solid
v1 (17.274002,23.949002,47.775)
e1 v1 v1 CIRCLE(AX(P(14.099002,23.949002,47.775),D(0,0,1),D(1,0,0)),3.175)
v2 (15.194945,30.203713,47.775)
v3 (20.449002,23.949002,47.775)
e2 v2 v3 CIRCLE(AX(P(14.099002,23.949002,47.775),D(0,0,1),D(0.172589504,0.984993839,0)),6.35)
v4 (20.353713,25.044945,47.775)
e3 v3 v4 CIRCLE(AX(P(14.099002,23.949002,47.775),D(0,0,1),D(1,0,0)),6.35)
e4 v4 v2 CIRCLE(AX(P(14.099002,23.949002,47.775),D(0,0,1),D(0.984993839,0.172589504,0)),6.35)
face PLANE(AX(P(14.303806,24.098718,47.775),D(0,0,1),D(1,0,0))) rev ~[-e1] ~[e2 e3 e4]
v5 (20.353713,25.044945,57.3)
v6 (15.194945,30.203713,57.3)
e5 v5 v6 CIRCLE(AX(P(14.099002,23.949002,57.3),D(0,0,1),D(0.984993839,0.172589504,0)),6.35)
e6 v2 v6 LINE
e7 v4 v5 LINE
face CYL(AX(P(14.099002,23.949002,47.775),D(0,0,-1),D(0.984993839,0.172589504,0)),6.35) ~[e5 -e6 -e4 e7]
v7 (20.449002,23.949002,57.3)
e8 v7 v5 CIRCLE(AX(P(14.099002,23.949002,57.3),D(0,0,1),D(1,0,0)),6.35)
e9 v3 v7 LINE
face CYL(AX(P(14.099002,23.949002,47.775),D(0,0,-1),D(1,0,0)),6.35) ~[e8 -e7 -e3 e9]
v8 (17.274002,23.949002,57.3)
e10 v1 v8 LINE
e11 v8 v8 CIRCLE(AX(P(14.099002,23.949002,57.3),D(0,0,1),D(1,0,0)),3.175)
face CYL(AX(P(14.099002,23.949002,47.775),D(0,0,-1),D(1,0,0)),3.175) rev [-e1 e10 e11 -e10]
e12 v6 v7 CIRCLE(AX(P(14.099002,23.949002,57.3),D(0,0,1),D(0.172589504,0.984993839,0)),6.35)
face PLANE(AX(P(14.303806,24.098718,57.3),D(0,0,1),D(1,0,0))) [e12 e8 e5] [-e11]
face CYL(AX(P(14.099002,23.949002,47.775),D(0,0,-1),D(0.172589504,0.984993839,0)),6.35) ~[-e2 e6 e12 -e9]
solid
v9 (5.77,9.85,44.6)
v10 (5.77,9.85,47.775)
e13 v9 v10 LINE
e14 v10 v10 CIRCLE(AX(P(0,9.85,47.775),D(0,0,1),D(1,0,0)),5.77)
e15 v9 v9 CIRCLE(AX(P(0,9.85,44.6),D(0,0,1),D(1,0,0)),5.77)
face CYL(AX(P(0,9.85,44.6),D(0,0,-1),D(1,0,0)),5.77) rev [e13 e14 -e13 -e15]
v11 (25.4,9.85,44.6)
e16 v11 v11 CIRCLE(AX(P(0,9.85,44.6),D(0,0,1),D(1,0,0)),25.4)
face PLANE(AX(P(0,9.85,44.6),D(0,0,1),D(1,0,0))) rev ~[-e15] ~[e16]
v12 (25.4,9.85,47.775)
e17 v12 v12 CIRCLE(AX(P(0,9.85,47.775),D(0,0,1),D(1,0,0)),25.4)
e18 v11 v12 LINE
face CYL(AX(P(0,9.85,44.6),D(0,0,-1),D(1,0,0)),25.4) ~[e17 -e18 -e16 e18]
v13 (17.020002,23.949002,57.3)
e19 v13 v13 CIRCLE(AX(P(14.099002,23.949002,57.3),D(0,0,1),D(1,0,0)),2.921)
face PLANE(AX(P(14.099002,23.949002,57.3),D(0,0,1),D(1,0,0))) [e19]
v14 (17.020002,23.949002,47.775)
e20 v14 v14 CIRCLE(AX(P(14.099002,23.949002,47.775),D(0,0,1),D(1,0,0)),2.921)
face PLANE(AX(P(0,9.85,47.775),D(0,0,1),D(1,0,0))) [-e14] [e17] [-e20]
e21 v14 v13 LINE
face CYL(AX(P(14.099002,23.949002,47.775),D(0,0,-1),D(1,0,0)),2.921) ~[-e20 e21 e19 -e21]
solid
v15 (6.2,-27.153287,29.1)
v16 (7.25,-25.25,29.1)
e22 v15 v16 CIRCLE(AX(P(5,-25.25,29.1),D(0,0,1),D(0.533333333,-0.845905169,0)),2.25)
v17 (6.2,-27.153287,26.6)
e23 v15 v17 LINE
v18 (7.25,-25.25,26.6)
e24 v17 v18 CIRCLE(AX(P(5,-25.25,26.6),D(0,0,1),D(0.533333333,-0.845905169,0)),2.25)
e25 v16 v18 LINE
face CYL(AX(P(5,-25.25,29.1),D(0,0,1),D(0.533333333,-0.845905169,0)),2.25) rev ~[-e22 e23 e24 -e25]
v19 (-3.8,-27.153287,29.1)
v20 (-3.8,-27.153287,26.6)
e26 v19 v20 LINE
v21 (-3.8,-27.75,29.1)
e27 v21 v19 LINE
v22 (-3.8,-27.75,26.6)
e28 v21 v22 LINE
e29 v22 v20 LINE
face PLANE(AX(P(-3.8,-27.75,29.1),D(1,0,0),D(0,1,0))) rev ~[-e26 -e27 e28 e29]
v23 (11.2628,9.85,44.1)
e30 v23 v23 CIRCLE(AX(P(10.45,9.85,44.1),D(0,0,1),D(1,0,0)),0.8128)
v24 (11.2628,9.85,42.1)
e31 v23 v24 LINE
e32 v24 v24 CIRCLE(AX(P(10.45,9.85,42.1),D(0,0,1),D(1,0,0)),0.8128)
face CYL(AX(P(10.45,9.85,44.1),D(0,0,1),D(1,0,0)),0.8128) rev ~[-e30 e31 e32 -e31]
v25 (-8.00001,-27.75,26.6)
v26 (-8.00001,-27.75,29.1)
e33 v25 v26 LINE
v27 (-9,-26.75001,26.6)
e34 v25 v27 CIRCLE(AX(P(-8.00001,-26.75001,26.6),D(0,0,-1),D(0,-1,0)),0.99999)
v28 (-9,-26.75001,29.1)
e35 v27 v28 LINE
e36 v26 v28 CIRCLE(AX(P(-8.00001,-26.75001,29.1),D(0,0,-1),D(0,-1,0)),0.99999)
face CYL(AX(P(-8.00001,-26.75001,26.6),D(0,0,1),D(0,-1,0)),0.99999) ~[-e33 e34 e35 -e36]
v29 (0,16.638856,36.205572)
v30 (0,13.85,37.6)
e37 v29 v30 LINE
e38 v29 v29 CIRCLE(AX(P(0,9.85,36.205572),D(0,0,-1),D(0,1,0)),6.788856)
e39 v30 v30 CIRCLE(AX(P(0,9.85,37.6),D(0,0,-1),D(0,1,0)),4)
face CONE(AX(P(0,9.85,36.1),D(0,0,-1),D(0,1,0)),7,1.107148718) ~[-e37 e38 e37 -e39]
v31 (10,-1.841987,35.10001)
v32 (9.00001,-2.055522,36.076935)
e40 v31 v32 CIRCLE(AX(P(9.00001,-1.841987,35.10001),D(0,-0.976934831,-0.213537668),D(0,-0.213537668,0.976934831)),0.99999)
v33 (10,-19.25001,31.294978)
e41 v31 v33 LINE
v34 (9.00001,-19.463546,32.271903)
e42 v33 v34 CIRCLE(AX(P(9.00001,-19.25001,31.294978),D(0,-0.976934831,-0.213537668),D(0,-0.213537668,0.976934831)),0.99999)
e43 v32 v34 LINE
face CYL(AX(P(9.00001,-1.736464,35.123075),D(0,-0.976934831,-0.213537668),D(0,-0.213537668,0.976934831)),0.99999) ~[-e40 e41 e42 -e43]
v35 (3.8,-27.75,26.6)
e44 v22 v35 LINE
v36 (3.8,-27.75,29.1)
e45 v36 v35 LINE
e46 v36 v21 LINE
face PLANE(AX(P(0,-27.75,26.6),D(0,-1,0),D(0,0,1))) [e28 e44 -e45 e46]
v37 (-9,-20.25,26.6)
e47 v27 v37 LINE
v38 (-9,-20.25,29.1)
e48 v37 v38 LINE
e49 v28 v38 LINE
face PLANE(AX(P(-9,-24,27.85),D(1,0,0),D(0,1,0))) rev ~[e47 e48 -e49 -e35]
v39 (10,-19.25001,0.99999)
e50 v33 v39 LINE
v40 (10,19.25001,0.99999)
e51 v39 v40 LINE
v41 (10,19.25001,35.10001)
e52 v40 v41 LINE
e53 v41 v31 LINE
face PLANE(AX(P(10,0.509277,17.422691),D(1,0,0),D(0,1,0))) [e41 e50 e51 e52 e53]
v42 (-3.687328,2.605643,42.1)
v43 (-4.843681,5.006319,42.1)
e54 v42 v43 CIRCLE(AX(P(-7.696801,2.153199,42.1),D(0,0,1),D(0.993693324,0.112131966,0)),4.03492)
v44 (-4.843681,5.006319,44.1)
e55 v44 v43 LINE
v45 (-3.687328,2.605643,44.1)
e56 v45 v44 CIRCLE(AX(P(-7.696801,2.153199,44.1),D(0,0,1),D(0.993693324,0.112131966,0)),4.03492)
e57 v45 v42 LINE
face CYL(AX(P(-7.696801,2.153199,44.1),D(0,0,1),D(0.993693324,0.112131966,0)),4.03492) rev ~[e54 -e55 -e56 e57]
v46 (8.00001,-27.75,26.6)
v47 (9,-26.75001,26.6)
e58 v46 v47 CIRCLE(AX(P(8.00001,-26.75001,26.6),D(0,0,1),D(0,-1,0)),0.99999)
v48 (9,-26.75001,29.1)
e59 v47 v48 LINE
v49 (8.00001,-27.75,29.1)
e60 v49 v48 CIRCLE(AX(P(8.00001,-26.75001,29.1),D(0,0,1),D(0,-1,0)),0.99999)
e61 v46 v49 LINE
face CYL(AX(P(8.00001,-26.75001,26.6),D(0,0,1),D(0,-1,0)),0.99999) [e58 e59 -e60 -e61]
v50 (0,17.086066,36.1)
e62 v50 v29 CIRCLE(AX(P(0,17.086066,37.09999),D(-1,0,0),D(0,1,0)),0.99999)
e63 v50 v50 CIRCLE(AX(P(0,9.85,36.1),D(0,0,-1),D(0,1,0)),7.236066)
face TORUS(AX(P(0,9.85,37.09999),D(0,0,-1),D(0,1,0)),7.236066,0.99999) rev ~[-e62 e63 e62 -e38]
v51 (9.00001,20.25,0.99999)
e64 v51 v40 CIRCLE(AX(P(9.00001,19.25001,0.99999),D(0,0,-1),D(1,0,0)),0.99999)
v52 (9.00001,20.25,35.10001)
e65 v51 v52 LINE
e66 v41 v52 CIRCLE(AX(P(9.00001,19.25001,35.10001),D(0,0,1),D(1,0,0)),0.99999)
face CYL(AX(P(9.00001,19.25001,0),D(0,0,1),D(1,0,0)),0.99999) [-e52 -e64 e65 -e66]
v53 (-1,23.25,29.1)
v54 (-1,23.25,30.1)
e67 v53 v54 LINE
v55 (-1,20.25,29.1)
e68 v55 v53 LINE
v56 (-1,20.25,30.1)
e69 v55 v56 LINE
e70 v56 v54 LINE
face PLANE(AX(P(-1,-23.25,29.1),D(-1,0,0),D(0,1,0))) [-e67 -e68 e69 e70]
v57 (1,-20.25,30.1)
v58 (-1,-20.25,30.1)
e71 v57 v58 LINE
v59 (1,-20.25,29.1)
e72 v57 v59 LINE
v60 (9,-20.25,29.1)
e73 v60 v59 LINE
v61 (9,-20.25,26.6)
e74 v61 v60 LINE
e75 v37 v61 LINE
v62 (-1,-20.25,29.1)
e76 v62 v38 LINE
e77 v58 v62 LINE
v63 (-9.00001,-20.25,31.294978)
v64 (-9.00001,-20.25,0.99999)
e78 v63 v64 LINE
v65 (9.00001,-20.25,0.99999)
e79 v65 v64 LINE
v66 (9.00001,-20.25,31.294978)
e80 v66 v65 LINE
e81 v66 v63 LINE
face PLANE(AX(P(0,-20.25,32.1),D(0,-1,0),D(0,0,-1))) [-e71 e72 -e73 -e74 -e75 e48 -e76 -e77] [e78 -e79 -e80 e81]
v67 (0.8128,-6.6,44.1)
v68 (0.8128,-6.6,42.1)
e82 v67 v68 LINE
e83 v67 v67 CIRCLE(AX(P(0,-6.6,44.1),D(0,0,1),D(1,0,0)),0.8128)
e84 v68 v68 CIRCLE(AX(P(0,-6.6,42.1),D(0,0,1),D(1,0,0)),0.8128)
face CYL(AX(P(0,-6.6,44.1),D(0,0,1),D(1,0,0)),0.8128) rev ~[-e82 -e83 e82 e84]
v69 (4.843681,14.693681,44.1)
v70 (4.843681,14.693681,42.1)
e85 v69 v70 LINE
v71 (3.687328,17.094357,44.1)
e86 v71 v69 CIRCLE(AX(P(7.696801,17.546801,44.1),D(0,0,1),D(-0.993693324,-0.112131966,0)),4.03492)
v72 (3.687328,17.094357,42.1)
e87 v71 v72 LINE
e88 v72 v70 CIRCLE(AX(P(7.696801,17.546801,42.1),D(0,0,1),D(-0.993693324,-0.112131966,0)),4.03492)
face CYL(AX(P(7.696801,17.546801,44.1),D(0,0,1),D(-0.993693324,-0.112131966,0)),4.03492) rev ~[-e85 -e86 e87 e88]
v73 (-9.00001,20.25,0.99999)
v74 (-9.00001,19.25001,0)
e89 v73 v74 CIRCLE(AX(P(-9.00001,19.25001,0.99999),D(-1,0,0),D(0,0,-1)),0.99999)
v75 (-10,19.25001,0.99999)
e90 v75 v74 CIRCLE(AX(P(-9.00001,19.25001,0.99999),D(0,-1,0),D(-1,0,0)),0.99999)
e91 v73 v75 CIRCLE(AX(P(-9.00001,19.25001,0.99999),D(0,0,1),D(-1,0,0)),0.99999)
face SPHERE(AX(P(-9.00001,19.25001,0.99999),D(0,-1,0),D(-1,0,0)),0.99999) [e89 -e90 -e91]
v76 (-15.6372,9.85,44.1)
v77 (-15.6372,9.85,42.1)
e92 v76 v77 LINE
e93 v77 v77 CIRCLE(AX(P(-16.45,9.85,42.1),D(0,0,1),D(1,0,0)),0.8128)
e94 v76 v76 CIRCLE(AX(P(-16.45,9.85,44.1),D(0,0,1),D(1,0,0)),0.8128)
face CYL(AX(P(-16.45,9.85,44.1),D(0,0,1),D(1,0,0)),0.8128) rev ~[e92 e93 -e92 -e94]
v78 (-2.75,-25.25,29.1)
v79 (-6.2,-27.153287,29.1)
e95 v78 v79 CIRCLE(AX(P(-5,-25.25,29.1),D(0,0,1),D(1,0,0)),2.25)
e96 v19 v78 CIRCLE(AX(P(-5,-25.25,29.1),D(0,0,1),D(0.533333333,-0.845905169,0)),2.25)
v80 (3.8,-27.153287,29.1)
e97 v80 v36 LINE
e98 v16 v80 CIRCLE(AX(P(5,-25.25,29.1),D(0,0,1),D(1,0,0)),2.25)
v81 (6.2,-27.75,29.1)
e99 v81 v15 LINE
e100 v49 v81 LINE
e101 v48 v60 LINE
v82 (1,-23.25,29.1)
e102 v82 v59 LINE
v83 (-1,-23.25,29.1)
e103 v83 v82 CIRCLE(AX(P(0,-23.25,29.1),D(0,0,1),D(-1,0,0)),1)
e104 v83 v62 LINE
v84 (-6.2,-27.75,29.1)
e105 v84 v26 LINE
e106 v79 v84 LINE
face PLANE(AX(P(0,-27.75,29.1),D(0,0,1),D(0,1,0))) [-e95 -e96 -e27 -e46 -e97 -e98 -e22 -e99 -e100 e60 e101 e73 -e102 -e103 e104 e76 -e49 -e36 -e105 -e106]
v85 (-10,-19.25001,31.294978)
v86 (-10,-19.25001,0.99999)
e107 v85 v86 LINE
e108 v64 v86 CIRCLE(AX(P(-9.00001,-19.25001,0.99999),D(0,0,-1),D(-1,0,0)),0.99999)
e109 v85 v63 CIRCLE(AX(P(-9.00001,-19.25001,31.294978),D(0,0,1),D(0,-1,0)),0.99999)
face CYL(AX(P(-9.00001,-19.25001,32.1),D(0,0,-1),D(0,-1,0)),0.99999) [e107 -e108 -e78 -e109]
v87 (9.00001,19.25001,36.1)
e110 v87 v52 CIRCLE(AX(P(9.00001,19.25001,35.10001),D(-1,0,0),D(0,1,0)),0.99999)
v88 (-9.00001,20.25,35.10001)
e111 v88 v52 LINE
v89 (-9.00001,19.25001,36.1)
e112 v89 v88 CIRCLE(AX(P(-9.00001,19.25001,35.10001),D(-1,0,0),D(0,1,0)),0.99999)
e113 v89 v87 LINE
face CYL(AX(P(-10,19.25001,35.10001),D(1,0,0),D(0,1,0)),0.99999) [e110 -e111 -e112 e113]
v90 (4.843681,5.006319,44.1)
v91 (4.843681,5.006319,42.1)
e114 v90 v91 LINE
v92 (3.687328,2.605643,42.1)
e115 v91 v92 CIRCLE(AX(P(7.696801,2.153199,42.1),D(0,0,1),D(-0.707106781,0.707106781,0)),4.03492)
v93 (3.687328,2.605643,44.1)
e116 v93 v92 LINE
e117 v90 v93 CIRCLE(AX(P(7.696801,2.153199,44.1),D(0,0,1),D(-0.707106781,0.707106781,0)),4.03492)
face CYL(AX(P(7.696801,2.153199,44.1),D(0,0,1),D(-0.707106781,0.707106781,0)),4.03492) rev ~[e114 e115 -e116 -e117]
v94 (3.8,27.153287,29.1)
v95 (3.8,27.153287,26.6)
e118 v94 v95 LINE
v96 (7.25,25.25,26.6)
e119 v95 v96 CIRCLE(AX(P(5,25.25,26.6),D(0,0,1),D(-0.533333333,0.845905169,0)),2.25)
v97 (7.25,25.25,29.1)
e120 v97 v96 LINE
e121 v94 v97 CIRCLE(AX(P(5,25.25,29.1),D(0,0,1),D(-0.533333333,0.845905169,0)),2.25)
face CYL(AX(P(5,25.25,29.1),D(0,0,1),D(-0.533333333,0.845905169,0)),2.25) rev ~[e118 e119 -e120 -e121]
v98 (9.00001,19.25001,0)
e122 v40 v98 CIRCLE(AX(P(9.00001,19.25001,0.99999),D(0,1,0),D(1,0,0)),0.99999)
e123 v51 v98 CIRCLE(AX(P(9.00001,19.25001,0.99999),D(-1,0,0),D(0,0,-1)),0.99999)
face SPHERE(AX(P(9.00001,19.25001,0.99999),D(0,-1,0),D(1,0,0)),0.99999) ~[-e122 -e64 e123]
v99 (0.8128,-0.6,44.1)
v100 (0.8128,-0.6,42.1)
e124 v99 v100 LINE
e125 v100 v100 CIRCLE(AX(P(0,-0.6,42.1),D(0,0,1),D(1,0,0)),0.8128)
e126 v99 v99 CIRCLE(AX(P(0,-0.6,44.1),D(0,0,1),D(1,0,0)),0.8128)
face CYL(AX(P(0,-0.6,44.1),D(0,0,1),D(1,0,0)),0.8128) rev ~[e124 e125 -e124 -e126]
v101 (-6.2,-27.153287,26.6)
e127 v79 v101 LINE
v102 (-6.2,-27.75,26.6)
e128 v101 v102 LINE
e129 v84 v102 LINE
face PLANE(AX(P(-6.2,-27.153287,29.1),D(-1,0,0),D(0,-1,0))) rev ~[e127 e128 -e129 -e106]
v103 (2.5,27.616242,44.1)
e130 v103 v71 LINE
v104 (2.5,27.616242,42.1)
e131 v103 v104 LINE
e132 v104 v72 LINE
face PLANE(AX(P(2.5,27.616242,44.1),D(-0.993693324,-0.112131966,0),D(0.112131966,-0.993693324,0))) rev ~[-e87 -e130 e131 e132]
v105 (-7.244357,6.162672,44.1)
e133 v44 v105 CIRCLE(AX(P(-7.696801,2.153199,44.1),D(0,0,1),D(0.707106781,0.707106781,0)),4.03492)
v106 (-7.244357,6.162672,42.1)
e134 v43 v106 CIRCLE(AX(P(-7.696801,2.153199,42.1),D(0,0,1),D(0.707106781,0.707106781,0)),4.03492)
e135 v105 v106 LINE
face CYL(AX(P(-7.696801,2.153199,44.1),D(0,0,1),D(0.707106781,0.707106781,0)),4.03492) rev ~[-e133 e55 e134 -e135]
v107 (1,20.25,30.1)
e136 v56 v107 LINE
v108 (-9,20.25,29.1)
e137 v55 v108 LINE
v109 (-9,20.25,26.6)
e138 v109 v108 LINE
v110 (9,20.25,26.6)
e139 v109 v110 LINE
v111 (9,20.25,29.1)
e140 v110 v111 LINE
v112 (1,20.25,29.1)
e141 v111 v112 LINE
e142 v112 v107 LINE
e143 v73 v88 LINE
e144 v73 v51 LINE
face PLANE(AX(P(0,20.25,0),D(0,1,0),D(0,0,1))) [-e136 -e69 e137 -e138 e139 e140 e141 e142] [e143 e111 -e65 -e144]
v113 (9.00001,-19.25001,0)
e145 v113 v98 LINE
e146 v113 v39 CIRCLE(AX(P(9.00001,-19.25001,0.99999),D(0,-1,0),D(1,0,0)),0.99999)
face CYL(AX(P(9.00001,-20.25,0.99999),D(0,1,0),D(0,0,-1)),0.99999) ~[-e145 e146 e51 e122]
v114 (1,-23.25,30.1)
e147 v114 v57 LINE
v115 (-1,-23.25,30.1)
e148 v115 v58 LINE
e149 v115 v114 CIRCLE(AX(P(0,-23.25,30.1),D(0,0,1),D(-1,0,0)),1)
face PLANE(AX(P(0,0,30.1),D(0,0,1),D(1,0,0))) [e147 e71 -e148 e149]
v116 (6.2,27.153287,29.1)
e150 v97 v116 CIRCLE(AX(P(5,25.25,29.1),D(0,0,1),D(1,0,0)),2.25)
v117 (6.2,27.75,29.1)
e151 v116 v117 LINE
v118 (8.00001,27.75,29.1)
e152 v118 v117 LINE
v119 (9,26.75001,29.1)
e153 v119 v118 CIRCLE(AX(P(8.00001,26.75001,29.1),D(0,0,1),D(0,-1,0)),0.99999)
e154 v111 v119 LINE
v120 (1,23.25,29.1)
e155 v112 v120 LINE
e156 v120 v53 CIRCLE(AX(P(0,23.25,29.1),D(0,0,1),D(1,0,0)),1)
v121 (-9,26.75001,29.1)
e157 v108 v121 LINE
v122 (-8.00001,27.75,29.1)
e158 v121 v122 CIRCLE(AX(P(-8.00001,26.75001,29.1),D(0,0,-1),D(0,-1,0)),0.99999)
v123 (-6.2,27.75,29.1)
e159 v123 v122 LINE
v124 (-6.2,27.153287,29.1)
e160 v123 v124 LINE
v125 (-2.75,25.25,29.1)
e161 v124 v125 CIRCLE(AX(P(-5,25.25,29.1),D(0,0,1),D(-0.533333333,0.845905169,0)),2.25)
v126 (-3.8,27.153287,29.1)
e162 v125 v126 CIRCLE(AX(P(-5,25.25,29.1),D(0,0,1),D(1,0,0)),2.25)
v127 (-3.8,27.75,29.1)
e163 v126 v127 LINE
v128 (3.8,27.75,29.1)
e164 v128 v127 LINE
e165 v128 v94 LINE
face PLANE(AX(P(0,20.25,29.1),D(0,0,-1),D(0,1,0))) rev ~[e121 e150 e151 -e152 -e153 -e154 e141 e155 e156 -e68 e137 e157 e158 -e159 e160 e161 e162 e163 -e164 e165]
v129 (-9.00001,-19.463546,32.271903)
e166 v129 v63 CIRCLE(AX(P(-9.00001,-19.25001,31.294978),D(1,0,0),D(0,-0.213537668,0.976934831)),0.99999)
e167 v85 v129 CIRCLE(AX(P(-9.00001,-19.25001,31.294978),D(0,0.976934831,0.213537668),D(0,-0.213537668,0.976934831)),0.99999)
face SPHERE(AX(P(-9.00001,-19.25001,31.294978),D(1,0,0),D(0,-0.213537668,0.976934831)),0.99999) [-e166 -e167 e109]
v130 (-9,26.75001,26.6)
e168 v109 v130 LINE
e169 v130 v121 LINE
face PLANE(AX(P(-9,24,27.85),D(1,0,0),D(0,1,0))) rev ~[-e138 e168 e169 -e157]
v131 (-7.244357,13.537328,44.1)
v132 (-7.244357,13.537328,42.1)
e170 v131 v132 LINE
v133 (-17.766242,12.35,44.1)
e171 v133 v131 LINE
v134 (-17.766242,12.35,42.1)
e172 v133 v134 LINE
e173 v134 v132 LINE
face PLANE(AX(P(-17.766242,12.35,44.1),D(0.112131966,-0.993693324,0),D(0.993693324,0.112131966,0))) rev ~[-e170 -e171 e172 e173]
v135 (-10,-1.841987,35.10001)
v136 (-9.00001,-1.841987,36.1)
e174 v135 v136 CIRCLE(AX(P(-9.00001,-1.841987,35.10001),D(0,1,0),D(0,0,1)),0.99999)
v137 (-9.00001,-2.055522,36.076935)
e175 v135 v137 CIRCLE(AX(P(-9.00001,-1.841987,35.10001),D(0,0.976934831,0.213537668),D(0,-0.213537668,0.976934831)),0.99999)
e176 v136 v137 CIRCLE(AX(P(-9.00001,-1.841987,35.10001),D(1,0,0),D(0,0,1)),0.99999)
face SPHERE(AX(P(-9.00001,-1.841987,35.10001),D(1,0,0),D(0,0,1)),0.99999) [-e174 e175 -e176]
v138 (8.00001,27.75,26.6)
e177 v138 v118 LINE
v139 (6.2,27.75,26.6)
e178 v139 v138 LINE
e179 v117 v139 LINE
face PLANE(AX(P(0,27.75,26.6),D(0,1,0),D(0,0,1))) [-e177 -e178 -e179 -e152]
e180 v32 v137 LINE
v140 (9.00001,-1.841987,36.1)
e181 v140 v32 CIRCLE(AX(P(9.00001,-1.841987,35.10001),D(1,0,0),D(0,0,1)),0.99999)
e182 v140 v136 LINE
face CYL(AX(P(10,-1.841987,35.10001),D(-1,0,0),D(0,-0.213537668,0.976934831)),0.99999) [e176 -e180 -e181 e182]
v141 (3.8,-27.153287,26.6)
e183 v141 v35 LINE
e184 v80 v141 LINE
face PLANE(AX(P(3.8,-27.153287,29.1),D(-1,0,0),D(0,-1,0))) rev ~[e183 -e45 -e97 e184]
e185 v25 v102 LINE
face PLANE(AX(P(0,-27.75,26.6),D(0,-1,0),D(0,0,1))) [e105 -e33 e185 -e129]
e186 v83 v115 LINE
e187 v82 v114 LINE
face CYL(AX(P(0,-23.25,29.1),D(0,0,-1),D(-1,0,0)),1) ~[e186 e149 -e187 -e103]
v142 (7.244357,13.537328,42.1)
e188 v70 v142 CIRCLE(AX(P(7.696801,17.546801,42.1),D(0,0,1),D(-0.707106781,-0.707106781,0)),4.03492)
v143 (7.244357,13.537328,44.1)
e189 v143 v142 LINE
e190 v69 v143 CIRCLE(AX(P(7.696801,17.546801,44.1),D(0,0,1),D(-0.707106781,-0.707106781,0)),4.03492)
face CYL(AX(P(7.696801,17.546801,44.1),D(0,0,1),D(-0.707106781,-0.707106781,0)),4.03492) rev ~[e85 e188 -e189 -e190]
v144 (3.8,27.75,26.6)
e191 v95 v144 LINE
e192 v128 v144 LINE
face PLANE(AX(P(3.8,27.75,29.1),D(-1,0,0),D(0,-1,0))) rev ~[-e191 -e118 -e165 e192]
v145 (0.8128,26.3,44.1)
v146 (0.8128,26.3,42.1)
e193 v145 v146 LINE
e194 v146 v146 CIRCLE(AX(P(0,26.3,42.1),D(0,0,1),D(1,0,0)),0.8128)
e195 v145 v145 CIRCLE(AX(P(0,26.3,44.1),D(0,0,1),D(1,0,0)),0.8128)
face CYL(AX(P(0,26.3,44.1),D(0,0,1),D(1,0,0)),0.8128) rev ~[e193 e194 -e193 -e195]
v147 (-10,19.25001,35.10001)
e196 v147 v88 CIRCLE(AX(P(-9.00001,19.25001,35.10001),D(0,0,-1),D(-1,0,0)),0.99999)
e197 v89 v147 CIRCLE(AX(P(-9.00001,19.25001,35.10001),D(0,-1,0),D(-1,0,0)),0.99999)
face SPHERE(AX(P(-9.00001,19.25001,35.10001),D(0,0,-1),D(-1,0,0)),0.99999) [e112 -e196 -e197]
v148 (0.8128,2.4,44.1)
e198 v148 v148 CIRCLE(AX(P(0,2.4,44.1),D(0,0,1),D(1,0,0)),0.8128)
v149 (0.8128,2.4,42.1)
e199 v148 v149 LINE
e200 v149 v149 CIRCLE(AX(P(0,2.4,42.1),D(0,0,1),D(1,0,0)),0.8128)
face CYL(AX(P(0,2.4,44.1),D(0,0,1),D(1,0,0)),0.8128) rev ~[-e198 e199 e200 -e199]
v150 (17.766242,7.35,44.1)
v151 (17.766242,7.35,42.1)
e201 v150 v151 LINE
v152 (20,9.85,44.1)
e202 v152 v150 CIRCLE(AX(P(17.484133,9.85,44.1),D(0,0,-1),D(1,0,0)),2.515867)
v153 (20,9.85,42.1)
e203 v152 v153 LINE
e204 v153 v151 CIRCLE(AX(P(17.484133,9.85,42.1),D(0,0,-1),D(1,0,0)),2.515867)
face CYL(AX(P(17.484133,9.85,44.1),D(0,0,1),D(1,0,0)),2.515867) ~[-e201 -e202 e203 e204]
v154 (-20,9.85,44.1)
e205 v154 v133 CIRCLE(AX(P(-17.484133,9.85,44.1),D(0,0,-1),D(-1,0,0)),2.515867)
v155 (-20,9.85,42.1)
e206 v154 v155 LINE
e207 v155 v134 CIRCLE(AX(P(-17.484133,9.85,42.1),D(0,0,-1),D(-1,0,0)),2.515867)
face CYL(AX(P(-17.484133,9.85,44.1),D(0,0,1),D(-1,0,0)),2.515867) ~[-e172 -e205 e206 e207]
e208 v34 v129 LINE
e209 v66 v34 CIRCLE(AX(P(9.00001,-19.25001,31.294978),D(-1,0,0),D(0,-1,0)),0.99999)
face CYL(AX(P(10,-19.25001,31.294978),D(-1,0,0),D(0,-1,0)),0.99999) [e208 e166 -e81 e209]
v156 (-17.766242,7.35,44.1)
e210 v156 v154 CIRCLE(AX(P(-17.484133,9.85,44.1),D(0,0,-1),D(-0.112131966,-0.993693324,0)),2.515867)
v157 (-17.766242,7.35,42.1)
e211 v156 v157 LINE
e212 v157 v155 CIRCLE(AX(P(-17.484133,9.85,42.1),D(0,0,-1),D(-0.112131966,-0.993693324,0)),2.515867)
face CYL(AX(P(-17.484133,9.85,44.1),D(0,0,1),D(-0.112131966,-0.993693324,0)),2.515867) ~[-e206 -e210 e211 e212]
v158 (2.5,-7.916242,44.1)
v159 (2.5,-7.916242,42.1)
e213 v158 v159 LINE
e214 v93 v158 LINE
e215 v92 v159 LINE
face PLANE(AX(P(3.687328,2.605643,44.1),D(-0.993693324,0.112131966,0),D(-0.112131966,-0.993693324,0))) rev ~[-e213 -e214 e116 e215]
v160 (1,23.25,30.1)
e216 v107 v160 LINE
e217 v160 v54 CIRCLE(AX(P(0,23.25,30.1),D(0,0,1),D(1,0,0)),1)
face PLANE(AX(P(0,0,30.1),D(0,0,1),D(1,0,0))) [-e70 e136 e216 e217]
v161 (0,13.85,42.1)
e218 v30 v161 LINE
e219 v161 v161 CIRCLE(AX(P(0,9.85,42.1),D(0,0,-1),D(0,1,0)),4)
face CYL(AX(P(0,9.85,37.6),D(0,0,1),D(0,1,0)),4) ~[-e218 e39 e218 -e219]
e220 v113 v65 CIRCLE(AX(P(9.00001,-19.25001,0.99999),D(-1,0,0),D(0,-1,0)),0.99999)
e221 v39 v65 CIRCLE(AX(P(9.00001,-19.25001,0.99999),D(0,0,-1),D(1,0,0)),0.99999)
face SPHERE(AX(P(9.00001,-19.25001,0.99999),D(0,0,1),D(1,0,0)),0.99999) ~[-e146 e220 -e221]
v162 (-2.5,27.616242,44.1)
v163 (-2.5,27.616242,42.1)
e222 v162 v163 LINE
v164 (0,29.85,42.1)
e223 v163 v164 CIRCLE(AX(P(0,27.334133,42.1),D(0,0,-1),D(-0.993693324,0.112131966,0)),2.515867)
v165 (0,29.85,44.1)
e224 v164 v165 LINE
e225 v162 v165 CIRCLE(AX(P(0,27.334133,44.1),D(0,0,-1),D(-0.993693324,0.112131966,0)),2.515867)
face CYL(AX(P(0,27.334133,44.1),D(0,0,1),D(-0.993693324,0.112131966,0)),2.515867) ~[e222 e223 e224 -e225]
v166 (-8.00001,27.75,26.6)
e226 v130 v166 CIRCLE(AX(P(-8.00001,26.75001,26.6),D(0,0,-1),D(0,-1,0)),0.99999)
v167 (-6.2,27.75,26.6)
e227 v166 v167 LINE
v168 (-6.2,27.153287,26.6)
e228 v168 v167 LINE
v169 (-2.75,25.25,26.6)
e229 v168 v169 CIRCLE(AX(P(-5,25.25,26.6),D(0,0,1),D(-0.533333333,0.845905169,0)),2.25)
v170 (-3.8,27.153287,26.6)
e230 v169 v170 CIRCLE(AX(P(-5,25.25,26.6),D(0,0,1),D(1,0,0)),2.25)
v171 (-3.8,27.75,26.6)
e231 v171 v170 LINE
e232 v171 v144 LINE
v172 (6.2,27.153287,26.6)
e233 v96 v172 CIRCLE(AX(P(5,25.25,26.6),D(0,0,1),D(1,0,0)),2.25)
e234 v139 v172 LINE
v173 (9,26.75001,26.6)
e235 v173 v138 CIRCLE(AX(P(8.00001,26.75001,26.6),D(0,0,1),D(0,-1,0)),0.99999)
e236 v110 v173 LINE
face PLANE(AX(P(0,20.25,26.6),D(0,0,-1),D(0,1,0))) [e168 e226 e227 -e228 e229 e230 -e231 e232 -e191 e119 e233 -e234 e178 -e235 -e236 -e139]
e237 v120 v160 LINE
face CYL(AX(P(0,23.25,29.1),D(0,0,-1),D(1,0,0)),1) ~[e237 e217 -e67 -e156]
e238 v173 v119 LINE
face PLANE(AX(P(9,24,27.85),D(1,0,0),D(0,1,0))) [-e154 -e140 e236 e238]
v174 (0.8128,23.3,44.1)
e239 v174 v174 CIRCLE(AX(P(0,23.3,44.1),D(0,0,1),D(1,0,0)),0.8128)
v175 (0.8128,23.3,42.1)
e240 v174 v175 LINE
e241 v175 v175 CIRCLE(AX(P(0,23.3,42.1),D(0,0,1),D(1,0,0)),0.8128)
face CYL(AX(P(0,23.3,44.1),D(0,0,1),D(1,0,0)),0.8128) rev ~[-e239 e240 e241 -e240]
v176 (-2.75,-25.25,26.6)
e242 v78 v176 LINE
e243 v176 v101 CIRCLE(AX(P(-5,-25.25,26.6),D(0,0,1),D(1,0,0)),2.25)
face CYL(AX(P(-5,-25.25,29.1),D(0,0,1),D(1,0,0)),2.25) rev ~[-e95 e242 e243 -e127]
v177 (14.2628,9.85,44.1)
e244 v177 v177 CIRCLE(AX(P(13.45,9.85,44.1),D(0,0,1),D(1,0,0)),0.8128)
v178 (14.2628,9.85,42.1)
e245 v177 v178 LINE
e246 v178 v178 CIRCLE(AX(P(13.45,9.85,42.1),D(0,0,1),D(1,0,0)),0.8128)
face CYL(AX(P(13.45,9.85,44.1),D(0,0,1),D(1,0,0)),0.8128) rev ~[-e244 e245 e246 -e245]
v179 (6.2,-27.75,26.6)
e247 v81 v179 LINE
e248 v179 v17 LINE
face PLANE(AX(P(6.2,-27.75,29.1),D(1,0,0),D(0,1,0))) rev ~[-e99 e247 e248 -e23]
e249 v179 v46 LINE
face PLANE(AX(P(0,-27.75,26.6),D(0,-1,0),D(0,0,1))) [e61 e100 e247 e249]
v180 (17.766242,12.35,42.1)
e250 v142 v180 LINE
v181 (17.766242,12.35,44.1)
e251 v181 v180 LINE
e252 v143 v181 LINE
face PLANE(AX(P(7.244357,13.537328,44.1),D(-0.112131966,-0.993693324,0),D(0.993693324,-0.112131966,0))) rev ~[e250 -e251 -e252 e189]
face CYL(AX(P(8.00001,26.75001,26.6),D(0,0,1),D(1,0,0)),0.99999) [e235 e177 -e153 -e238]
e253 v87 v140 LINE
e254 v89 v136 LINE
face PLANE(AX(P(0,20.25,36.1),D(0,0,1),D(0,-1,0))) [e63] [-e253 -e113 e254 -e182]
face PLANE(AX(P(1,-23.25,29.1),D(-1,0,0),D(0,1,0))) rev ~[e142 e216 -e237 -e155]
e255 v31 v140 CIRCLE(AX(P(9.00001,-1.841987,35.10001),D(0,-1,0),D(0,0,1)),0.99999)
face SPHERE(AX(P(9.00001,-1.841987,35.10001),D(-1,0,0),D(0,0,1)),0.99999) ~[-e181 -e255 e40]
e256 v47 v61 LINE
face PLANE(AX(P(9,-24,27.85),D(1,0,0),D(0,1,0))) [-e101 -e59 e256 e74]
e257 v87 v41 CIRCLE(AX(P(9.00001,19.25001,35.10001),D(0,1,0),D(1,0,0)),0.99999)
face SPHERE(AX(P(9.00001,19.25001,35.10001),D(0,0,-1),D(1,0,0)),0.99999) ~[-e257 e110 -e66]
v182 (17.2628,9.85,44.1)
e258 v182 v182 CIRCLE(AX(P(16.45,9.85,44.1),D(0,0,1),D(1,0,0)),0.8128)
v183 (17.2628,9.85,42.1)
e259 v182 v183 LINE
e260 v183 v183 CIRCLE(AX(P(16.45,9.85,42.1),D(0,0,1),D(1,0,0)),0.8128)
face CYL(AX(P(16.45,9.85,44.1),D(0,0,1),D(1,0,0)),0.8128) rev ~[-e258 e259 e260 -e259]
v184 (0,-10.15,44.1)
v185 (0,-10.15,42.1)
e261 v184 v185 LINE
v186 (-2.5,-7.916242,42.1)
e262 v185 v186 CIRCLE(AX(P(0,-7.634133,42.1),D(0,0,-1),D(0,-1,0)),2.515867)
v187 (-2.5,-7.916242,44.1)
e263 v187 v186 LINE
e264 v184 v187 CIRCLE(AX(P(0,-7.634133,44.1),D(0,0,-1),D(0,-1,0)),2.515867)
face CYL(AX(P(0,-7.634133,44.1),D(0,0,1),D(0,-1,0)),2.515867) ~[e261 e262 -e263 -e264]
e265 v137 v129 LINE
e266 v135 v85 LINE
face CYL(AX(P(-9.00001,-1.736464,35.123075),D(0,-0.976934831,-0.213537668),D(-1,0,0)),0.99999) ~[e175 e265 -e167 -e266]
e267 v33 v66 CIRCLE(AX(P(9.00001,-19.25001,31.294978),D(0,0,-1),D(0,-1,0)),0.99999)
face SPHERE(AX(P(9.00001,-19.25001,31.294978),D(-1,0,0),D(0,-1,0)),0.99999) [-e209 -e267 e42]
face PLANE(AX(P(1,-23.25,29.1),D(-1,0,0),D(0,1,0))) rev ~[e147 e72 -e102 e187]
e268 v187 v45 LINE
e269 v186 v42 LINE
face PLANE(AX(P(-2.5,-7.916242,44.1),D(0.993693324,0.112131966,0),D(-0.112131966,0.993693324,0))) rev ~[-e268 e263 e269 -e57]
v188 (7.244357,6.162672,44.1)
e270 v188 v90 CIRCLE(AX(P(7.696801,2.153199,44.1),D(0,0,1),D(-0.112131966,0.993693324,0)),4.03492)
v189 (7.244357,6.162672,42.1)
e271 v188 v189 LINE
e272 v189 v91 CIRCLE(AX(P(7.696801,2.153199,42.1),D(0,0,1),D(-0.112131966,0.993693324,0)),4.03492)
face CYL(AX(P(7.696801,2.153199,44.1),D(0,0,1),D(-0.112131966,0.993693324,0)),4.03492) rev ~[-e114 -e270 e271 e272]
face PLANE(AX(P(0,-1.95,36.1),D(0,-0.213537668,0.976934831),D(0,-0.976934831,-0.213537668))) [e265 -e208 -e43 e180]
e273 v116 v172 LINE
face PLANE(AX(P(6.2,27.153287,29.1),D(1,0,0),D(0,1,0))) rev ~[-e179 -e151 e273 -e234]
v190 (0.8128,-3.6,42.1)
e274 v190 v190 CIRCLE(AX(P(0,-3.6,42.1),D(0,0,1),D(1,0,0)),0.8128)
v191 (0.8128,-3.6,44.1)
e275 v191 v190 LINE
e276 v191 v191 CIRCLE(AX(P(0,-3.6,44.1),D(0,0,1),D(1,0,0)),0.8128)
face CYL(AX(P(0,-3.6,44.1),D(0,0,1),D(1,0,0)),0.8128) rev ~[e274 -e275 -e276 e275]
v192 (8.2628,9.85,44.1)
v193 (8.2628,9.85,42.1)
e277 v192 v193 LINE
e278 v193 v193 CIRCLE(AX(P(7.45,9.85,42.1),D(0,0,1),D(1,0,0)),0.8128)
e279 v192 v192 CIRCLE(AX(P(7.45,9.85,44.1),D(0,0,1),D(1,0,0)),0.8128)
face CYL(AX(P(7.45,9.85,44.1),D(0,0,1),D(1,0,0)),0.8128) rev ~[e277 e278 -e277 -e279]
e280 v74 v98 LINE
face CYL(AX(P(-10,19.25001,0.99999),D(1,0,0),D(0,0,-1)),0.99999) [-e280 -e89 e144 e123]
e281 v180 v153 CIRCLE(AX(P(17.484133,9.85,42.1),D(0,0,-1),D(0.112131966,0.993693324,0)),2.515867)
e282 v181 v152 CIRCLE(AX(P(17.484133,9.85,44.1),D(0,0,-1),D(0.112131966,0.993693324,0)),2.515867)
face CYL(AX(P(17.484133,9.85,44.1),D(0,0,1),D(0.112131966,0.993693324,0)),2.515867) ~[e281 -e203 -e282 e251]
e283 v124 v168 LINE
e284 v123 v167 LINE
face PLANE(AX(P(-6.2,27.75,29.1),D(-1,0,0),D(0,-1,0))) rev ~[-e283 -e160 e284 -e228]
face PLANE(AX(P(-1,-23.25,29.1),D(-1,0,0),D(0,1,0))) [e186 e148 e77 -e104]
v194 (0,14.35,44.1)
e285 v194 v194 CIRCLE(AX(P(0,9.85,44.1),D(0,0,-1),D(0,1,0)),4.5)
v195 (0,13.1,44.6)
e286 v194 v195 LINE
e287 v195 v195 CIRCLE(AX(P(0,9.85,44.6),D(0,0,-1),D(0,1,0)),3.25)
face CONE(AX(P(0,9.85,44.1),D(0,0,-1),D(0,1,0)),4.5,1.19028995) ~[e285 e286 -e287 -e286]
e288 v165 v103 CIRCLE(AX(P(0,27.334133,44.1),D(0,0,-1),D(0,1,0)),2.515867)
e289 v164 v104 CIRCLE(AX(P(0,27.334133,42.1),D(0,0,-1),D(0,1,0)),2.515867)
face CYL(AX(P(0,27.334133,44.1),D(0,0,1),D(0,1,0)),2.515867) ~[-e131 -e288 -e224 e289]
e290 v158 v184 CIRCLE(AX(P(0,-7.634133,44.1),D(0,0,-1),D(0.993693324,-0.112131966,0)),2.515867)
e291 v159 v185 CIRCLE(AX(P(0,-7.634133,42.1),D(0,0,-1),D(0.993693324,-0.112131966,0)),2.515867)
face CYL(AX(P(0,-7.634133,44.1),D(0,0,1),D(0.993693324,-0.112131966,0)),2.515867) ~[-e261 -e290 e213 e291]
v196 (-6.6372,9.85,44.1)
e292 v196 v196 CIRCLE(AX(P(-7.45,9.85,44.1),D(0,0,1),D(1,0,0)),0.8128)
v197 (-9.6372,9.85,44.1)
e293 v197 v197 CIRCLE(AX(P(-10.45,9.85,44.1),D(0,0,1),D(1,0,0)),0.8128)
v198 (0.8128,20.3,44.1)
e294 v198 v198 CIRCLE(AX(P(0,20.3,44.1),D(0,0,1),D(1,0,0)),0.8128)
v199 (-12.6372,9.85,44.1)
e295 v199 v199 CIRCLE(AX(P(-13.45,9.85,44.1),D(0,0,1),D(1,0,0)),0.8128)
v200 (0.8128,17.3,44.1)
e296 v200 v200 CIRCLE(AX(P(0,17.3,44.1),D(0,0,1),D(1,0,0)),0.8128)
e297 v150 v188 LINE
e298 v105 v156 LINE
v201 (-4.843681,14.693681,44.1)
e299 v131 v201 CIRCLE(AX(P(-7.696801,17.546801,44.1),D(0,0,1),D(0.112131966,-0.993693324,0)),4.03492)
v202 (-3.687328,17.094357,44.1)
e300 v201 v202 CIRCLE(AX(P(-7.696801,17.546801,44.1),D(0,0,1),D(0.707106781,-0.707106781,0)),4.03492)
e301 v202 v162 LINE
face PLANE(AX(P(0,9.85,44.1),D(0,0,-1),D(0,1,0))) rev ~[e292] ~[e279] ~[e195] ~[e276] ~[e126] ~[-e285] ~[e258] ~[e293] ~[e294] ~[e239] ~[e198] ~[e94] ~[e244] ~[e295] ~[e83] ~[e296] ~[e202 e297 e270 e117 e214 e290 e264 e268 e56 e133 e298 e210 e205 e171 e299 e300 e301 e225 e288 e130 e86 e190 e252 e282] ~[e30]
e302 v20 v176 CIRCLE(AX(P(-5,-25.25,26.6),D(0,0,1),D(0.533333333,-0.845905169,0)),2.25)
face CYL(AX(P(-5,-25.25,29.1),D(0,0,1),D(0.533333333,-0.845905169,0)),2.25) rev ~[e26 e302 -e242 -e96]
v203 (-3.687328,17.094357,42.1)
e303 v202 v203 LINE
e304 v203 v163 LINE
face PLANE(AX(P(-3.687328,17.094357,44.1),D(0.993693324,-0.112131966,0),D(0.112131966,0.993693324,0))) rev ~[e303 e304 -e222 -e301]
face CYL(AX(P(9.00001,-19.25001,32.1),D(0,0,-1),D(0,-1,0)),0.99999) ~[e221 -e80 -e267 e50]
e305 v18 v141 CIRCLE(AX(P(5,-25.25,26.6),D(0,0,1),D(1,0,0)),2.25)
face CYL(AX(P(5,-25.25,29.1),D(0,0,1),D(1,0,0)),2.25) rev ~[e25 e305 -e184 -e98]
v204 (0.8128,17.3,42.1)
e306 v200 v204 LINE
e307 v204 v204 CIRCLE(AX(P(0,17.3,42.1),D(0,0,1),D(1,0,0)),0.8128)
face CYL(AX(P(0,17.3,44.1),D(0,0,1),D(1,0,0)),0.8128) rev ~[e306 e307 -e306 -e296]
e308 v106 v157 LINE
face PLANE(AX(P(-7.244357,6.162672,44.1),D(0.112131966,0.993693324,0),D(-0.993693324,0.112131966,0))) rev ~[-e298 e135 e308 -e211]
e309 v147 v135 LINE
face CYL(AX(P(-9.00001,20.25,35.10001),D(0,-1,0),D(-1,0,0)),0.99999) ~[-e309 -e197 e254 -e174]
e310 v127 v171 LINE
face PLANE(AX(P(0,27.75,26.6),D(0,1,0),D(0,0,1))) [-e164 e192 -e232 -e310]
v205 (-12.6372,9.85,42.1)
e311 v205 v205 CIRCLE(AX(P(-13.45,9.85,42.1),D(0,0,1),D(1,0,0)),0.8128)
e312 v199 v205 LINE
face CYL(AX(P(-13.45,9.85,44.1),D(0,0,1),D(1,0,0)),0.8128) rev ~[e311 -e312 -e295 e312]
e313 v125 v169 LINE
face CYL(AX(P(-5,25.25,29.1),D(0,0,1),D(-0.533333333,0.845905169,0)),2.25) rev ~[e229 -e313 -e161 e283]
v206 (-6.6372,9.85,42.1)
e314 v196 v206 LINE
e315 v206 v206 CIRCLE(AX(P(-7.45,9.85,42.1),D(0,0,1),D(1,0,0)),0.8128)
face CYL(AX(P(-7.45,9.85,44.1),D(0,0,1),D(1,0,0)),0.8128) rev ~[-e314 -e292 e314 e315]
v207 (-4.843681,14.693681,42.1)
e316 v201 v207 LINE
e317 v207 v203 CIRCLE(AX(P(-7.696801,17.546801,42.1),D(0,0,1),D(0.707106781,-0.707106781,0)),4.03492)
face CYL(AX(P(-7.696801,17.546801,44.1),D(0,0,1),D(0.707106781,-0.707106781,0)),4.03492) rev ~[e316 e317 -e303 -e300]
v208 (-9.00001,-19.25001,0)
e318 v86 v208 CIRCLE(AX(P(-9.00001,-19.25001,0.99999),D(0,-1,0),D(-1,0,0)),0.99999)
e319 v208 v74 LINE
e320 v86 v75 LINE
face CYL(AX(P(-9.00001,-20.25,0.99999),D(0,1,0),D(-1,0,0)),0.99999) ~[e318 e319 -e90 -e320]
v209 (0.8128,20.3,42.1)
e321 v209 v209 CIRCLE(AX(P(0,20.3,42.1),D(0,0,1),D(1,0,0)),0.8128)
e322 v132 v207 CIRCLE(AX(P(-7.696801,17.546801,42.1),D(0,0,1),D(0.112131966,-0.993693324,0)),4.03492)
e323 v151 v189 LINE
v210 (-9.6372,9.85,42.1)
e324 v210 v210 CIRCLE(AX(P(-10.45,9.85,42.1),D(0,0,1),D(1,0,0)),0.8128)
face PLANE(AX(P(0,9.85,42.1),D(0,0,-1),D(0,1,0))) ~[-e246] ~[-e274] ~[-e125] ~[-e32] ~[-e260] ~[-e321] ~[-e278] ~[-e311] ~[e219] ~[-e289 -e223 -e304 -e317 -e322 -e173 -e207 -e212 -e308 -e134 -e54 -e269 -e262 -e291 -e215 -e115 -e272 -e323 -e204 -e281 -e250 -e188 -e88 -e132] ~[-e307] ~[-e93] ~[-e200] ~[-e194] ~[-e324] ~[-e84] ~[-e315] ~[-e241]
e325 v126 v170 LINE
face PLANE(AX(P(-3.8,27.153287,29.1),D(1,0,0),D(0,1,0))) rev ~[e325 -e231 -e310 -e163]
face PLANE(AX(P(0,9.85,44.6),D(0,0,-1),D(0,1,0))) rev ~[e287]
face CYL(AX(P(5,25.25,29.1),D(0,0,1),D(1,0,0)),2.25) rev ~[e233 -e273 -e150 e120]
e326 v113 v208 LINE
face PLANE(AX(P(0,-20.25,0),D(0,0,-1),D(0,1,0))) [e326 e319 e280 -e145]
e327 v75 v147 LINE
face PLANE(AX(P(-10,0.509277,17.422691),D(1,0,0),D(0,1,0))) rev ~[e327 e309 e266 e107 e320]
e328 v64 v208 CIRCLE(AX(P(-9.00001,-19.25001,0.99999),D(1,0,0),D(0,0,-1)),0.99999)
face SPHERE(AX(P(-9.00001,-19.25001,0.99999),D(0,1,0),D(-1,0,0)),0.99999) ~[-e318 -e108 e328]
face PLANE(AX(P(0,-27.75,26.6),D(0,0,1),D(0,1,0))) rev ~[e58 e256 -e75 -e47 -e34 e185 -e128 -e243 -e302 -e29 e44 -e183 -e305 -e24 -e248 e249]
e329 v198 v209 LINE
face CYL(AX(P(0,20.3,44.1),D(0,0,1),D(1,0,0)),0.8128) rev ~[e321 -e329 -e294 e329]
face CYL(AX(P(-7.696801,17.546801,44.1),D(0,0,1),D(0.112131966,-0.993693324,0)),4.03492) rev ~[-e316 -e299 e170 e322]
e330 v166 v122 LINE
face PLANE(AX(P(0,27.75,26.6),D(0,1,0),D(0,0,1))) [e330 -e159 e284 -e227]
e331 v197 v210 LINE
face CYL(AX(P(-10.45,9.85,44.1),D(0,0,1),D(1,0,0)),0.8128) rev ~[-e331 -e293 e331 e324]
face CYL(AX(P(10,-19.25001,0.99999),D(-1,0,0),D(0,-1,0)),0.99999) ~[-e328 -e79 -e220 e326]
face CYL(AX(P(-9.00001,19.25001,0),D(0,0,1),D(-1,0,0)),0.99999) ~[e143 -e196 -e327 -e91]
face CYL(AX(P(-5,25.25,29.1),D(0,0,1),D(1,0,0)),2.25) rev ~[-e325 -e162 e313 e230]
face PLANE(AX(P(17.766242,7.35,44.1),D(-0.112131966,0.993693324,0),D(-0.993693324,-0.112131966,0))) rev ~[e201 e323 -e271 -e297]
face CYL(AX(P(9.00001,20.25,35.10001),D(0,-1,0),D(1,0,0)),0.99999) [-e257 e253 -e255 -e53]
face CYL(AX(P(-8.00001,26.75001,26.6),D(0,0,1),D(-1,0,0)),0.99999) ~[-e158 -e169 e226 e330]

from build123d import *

# Parameters (mm, degrees)
F1_DEPTH  = 10
F0_W      = 7.5
F0_H      = 2.5
F2_DEPTH  = 9
F4_DEPTH  = 25
F5_W      = 2
F5_H      = 46.5
F6_DEPTH  = 1
F9_R      = 0.8128
F10_DEPTH = 2
F11_R     = 26.294756744
F12_DEPTH = 2
F13_R     = 0.99999
F14_R     = 25.4
F14_R_2   = 5.77
F15_DEPTH = 3.175
F16_R     = 2.921
F17_DEPTH = 9.525
F18_R     = 3.175
F19_DEPTH = 9.525


# Not quite as in the source:
# - a fillet or chamfer is up to 0.001 mm smaller than in the source, because OpenCascade refuses the exact size


with BuildPart() as f1:
    # F0 (on Right) → F1 (new body, symmetric)
    with BuildSketch(Plane.YZ):
        Polygon((-20.25, 26.6), (-20.25, 0), (20.25, 0), (20.25, 26.6), (20.25, 29.1), (20.25, 36.1), (-1.95, 36.1), (-20.25, 32.1), (-20.25, 29.1), align=None)
    extrude(amount=F1_DEPTH, both=True)

    # F0 (on Right) → F2 (join, symmetric)
    with BuildSketch(Plane.YZ):
        with Locations((-24, 27.85)):
            Rectangle(F0_W, F0_H)
        with Locations((24, 27.85)):
            Rectangle(F0_W, F0_H)
    extrude(amount=F2_DEPTH, both=True)

    # F3 (on face) → F4 (cut)
    with BuildSketch(Plane.XY.offset(29.1)):
        with BuildLine():
            ThreePointArc((-3.8, -27.1532866311), (-3.0299111695, -26.336853256), (-2.75, -25.25))
            ThreePointArc((-2.75, -25.25), (-6.086853256, -23.2799111695), (-6.2, -27.1532866311))
            ThreePointArc((-6.2, -27.1532866311), (-5, -27.5), (-3.8, -27.1532866311))
        make_face()
        with BuildLine():
            ThreePointArc((-3.8, -27.1532866311), (-5, -27.5), (-6.2, -27.1532866311))
            Line((-6.2, -27.1532866311), (-6.2, -27.75))
            Line((-6.2, -27.75), (-3.8, -27.75))
            Line((-3.8, -27.75), (-3.8, -27.1532866311))
        make_face()
        with BuildLine():
            Line((-3.8, 27.75), (-6.2, 27.75))
            Line((-6.2, 27.75), (-6.2, 27.1532866311))
            ThreePointArc((-6.2, 27.1532866311), (-5, 27.5), (-3.8, 27.1532866311))
            Line((-3.8, 27.1532866311), (-3.8, 27.75))
        make_face()
        with BuildLine():
            ThreePointArc((-3.8, 27.1532866311), (-5, 27.5), (-6.2, 27.1532866311))
            ThreePointArc((-6.2, 27.1532866311), (-6.086853256, 23.2799111695), (-2.75, 25.25))
            ThreePointArc((-2.75, 25.25), (-3.0299111695, 26.336853256), (-3.8, 27.1532866311))
        make_face()
        with BuildLine():
            Line((3.8, -27.1532866311), (3.8, -27.75))
            Line((3.8, -27.75), (6.2, -27.75))
            Line((6.2, -27.75), (6.2, -27.1532866311))
            ThreePointArc((6.2, -27.1532866311), (5, -27.5), (3.8, -27.1532866311))
        make_face()
        with BuildLine():
            ThreePointArc((7.25, -25.25), (3.913146744, -23.2799111695), (3.8, -27.1532866311))
            ThreePointArc((3.8, -27.1532866311), (5, -27.5), (6.2, -27.1532866311))
            ThreePointArc((6.2, -27.1532866311), (6.9700888305, -26.336853256), (7.25, -25.25))
        make_face()
        with BuildLine():
            Line((6.2, 27.75), (3.8, 27.75))
            Line((3.8, 27.75), (3.8, 27.1532866311))
            ThreePointArc((3.8, 27.1532866311), (5, 27.5), (6.2, 27.1532866311))
            Line((6.2, 27.1532866311), (6.2, 27.75))
        make_face()
        with BuildLine():
            ThreePointArc((6.2, 27.1532866311), (5, 27.5), (3.8, 27.1532866311))
            ThreePointArc((3.8, 27.1532866311), (3.913146744, 23.2799111695), (7.25, 25.25))
            ThreePointArc((7.25, 25.25), (6.9700888305, 26.336853256), (6.2, 27.1532866311))
        make_face()
    extrude(amount=-F4_DEPTH, mode=Mode.SUBTRACT)

    # F5 (on face) → F6 (join)
    with BuildSketch(Plane.XY.offset(29.1)):
        Rectangle(F5_W, F5_H)
        with BuildLine():
            Line((-1, 23.25), (1, 23.25))
            ThreePointArc((1, 23.25), (0, 24.25), (-1, 23.25))
        make_face()
        with BuildLine():
            ThreePointArc((-1, -23.25), (0, -24.25), (1, -23.25))
            Line((1, -23.25), (-1, -23.25))
        make_face()
    extrude(amount=F6_DEPTH)

    # F7 (on Right) → F8 (revolve)
    with BuildSketch(Plane.YZ):
        Polygon((9.85, 36.1), (16.85, 36.1), (13.85, 37.6), (13.85, 42.1), (29.85, 42.1), (29.85, 44.1), (14.35, 44.1), (13.1, 44.6), (9.85, 44.6), align=None)
    revolve(axis=Axis((0, 9.85, 38.956922479), (0, 0, -1)))

    # F9 (on face) → F10 (cut, through all)
    with BuildSketch(Plane.XY.offset(44.1)):
        with Locations((0, 17.3)):
            Circle(F9_R)
        with Locations((0, 20.3)):
            Circle(F9_R)
        with Locations((0, 23.3)):
            Circle(F9_R)
        with Locations((0, 26.3)):
            Circle(F9_R)
        with Locations((-16.45, 9.85)):
            Circle(F9_R)
        with Locations((-13.45, 9.85)):
            Circle(F9_R)
        with Locations((-10.45, 9.85)):
            Circle(F9_R)
        with Locations((-7.45, 9.85)):
            Circle(F9_R)
        with Locations((0, -6.6)):
            Circle(F9_R)
        with Locations((0, -3.6)):
            Circle(F9_R)
        with Locations((0, -0.6)):
            Circle(F9_R)
        with Locations((0, 2.4)):
            Circle(F9_R)
        with Locations((16.45, 9.85)):
            Circle(F9_R)
        with Locations((13.45, 9.85)):
            Circle(F9_R)
        with Locations((10.45, 9.85)):
            Circle(F9_R)
        with Locations((7.45, 9.85)):
            Circle(F9_R)
    extrude(amount=-F10_DEPTH, mode=Mode.SUBTRACT)

    # F11 (on face) → F12 (cut, through all)
    with BuildSketch(Plane.XY.offset(44.1)):
        with Locations((0, 9.85)):
            Circle(F11_R)
        with BuildLine():
            ThreePointArc((-4.8436814511, 14.6936814511), (-4.0616110554, 15.7958081166), (-3.6873277698, 17.0943570425))
            Line((-3.6873277698, 17.0943570425), (-2.5, 27.6162423281))
            ThreePointArc((-2.5, 27.6162423281), (-1.6762811024, 29.2102108544), (0, 29.85))
            ThreePointArc((0, 29.85), (1.6762811024, 29.2102108544), (2.5, 27.6162423281))
            Line((2.5, 27.6162423281), (3.6873277698, 17.0943570425))
            ThreePointArc((3.6873277698, 17.0943570425), (4.0616110554, 15.7958081166), (4.8436814511, 14.6936814511))
            ThreePointArc((4.8436814511, 14.6936814511), (5.9458081166, 13.9116110554), (7.2443570425, 13.5373277698))
            Line((7.2443570425, 13.5373277698), (17.7662423281, 12.35))
            ThreePointArc((17.7662423281, 12.35), (19.3602108544, 11.5262811024), (20, 9.85))
            ThreePointArc((20, 9.85), (19.3602108544, 8.1737188976), (17.7662423281, 7.35))
            Line((17.7662423281, 7.35), (7.2443570425, 6.1626722302))
            ThreePointArc((7.2443570425, 6.1626722302), (5.9458081166, 5.7883889446), (4.8436814511, 5.0063185489))
            ThreePointArc((4.8436814511, 5.0063185489), (4.0616110554, 3.9041918834), (3.6873277698, 2.6056429575))
            Line((3.6873277698, 2.6056429575), (2.5, -7.9162423281))
            ThreePointArc((2.5, -7.9162423281), (1.6762811024, -9.5102108544), (0, -10.15))
            ThreePointArc((0, -10.15), (-1.6762811024, -9.5102108544), (-2.5, -7.9162423281))
            Line((-2.5, -7.9162423281), (-3.6873277698, 2.6056429575))
            ThreePointArc((-3.6873277698, 2.6056429575), (-4.0616110554, 3.9041918834), (-4.8436814511, 5.0063185489))
            ThreePointArc((-4.8436814511, 5.0063185489), (-5.9458081166, 5.7883889446), (-7.2443570425, 6.1626722302))
            Line((-7.2443570425, 6.1626722302), (-17.7662423281, 7.35))
            ThreePointArc((-17.7662423281, 7.35), (-19.3602108544, 8.1737188976), (-20, 9.85))
            ThreePointArc((-20, 9.85), (-19.3602108544, 11.5262811024), (-17.7662423281, 12.35))
            Line((-17.7662423281, 12.35), (-7.2443570425, 13.5373277698))
            ThreePointArc((-7.2443570425, 13.5373277698), (-5.9458081166, 13.9116110554), (-4.8436814511, 14.6936814511))
        make_face(mode=Mode.SUBTRACT)
    extrude(amount=-F12_DEPTH, mode=Mode.SUBTRACT)

    # F13 (radius 1 in the source; OpenCascade refuses exactly that, so slightly less here)
    f13_edges = [f1.edges().sort_by_distance(p)[0] for p in [
        (10, -20.25, 16.05),
        (10, 0, 0),
        (10, 20.25, 18.05),
        (10, 9.15, 36.1),
        (10, -11.1, 34.1),
        (-10, 0, 0),
        (-10, 20.25, 18.05),
        (-10, 9.15, 36.1),
        (-10, -11.1, 34.1),
        (-10, -20.25, 16.05),
        (0, -20.25, 0),
        (0, 20.25, 0),
        (0, -1.95, 36.1),
        (0, -20.25, 32.1),
        (0, 20.25, 36.1),
        (0, 2.85, 36.1),
        (9, -27.75, 27.85),
        (-9, -27.75, 27.85),
        (9, 27.75, 27.85),
        (-9, 27.75, 27.85),
    ]]
    fillet(f13_edges, radius=F13_R)


with BuildPart() as f15:
    # F14 (on face) → F15 (new body)
    with BuildSketch(Plane.XY.offset(44.6)):
        with Locations((0, 9.85)):
            Circle(F14_R)
        with Locations((0, 9.85)):
            Circle(F14_R_2, mode=Mode.SUBTRACT)
    extrude(amount=F15_DEPTH)

    # F16 (on face) → F17 (join)
    with BuildSketch(Plane.XY.offset(47.775)):
        with Locations((14.0990021101, 23.9490021101)):
            Circle(F16_R)
    extrude(amount=F17_DEPTH)


with BuildPart() as f19:
    # F18 (on face) → F19 (new body)
    with BuildSketch(Plane.XY.offset(47.775)):
        with BuildLine():
            ThreePointArc((15.194945462, 30.2037129882), (9.2368143163, 19.8646870074), (20.4490021101, 23.9490021101))
            ThreePointArc((20.4490021101, 23.9490021101), (20.4251349761, 24.4990411649), (20.3537129882, 25.044945462))
            ThreePointArc((20.3537129882, 25.044945462), (17.9605122421, 27.8105122421), (15.194945462, 30.2037129882))
        make_face()
        with Locations((14.0990021101, 23.9490021101)):
            Circle(F18_R, mode=Mode.SUBTRACT)
        with BuildLine():
            ThreePointArc((15.194945462, 30.2037129882), (17.9605122421, 27.8105122421), (20.3537129882, 25.044945462))
            ThreePointArc((20.3537129882, 25.044945462), (18.5891301706, 28.4391301706), (15.194945462, 30.2037129882))
        make_face()
    extrude(amount=F19_DEPTH)


solid = Compound([f1.part, f15.part, f19.part])
